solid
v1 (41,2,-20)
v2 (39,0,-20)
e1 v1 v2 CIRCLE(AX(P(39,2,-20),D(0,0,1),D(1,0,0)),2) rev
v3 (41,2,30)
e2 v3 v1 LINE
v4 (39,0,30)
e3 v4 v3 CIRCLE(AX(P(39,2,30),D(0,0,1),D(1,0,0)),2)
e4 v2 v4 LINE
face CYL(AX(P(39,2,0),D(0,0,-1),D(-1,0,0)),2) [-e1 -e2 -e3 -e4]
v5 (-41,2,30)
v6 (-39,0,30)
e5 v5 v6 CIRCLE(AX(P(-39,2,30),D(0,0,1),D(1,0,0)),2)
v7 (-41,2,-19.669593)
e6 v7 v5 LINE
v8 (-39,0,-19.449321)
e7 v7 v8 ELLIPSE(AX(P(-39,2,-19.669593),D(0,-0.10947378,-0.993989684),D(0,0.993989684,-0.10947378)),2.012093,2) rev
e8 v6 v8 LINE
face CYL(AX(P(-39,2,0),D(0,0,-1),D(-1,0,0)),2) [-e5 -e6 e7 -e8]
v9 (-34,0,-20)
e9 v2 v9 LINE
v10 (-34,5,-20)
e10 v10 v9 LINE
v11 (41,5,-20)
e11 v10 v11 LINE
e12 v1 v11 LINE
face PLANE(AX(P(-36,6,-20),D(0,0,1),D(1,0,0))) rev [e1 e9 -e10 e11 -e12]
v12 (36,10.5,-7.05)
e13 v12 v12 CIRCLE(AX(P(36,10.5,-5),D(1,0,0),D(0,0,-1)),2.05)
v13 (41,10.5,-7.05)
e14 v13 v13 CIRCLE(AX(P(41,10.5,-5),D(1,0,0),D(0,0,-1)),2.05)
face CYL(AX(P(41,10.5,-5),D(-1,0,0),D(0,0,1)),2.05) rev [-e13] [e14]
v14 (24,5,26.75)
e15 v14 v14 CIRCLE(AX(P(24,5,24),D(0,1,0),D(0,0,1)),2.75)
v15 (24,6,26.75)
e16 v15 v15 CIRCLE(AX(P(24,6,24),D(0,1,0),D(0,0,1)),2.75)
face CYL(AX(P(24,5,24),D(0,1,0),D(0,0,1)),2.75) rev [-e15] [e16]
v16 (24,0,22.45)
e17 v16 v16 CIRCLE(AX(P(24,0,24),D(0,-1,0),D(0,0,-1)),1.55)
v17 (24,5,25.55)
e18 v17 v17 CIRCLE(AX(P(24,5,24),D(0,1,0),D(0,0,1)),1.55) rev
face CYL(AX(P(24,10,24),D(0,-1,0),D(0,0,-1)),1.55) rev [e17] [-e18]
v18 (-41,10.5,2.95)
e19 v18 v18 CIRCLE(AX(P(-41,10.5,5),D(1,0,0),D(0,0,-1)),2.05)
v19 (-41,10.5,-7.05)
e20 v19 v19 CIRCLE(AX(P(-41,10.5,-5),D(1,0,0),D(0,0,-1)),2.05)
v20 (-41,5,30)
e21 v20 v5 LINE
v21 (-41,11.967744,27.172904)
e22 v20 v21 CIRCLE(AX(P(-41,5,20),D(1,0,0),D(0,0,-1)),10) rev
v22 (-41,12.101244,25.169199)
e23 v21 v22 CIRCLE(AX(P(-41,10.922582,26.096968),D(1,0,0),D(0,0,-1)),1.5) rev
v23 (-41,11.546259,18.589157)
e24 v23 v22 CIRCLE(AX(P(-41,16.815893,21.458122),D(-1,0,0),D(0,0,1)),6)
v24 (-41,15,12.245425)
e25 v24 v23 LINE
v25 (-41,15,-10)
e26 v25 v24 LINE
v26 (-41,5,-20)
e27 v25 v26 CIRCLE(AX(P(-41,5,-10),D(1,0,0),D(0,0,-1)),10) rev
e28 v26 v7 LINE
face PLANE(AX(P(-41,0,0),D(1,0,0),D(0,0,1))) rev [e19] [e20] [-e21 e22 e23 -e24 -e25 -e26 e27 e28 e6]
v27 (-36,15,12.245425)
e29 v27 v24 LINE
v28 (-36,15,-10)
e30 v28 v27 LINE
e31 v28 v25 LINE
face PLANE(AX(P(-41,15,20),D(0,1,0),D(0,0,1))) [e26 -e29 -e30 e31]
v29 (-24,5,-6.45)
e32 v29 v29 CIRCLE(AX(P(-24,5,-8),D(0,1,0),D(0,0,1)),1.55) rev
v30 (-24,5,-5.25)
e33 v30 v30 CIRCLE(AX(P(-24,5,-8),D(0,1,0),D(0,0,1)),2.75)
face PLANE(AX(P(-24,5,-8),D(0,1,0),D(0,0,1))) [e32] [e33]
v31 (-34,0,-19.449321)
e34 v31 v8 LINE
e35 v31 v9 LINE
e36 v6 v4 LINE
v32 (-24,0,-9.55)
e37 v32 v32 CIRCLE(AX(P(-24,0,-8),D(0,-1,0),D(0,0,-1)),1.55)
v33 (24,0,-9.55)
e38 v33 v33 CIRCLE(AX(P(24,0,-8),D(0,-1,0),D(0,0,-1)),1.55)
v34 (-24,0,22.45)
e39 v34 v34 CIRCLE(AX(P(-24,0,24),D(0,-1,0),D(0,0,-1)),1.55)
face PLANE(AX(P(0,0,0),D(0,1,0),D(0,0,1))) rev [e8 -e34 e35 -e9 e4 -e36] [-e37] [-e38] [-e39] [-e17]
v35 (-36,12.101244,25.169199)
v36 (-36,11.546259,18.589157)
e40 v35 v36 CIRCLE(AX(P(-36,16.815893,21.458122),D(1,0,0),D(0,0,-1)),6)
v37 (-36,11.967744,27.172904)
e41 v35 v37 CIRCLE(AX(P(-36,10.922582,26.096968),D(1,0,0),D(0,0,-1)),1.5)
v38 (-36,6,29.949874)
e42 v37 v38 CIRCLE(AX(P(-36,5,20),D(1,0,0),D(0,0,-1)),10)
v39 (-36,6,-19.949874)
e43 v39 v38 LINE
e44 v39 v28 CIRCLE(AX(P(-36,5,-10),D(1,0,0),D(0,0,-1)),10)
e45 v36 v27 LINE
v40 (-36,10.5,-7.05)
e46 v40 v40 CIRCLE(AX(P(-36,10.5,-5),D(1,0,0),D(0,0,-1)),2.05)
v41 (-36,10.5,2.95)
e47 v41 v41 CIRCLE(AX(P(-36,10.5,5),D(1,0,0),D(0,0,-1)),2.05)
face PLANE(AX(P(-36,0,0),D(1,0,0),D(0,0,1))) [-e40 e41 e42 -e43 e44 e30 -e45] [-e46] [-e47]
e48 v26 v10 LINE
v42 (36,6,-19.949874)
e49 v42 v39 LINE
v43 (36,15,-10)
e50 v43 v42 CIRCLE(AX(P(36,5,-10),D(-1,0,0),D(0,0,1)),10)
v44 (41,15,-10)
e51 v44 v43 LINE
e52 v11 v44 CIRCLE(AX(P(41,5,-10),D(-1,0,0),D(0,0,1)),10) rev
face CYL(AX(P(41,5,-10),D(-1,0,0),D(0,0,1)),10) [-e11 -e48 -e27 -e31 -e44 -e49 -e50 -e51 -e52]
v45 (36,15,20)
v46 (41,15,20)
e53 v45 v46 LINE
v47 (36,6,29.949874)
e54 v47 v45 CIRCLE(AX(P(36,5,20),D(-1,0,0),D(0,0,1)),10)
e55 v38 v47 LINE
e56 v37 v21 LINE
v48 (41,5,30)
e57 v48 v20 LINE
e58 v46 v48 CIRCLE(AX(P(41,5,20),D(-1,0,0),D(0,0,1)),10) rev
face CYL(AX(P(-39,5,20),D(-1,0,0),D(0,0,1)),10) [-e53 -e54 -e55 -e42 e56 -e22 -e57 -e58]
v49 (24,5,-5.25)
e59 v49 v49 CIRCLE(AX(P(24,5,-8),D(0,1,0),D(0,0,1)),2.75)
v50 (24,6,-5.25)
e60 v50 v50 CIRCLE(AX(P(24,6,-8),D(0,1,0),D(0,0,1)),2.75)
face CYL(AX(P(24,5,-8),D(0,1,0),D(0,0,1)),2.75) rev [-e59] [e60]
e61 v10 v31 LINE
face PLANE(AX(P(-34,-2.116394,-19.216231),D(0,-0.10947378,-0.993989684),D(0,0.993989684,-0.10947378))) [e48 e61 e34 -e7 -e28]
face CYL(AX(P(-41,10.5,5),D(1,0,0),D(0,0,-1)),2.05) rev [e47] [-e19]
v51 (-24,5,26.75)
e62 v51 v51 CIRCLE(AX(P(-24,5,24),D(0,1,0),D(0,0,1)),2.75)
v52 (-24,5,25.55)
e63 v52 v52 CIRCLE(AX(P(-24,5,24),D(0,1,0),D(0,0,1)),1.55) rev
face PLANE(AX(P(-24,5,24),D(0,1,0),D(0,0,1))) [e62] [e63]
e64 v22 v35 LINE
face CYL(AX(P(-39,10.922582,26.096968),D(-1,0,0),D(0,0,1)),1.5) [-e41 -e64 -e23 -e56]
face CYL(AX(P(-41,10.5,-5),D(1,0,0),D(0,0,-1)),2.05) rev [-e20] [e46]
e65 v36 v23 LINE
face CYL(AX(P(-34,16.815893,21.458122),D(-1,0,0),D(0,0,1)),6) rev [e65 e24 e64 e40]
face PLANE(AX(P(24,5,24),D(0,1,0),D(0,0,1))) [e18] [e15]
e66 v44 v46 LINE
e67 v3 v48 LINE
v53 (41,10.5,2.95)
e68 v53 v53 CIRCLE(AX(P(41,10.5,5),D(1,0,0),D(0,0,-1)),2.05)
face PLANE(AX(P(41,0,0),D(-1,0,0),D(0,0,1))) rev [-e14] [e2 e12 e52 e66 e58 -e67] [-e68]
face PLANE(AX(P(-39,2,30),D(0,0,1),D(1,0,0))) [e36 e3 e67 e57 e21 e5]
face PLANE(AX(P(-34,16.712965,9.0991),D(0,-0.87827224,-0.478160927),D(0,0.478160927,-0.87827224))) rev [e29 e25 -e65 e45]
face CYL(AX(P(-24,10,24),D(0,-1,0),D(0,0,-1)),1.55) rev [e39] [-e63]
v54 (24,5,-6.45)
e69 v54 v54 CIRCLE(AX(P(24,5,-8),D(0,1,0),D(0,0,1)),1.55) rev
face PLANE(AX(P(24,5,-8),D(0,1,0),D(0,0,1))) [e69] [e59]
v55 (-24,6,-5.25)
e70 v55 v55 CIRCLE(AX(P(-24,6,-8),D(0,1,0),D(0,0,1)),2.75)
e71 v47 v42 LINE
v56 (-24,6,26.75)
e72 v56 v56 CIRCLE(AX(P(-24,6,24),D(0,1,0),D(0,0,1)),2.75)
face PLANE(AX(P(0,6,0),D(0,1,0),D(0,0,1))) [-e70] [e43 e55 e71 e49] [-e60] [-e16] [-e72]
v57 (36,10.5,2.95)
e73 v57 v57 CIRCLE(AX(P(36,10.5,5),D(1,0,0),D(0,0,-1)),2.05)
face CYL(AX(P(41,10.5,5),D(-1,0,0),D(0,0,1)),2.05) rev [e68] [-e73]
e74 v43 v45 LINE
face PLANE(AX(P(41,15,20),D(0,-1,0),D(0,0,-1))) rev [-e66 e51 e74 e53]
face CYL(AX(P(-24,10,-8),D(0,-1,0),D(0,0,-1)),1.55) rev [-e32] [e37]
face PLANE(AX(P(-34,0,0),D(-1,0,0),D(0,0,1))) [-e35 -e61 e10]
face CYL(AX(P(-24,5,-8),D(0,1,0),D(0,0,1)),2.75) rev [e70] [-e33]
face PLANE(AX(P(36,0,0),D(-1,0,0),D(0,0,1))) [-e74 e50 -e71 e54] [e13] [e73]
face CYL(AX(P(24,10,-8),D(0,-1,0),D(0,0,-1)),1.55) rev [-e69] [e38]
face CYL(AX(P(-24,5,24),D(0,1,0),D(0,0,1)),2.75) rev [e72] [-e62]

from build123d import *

# Parameters (mm, degrees)
SKETCH1_W           = 72
SKETCH1_H           = 40
BOSS_EXTRUDE1_DEPTH = 6
SKETCH3_W           = 40
SKETCH3_H           = 15
SKETCH3_R           = 2.05
BOSS_EXTRUDE2_DEPTH = 5
FILLET2_R           = 10
FILLET1_R           = 2
BOSS_EXTRUDE3_DEPTH = 10
SKETCH6_R           = 1.55
CUT_EXTRUDE2_DEPTH  = 10
SKETCH2_R           = 2.75
CUT_EXTRUDE1_DEPTH  = 1
FILLET3_R           = 10
CUT_EXTRUDE3_DEPTH  = 7
FILLET4_R           = 1.5


with BuildPart() as part:
    # Sketch1 → Boss-Extrude1 (new body)
    with BuildSketch(Plane(origin=(0, 0, 0), x_dir=(1, 0, 0), z_dir=(0, 1, 0))):
        Rectangle(SKETCH1_W, SKETCH1_H)
    extrude(amount=BOSS_EXTRUDE1_DEPTH)

    # Sketch3 → Boss-Extrude2 (add)
    with BuildSketch(Plane(origin=(36, 0, 0), x_dir=(0, 0, -1), z_dir=(1, 0, 0))):
        with Locations((0, 7.5)):
            Rectangle(SKETCH3_W, SKETCH3_H)
        with Locations((-5, 10.5)):
            Circle(SKETCH3_R, mode=Mode.SUBTRACT)
        with Locations((5, 10.5)):
            Circle(SKETCH3_R, mode=Mode.SUBTRACT)
    boss_extrude2 = extrude(amount=BOSS_EXTRUDE2_DEPTH)

    # Mirror1: Boss-Extrude2 across plane
    add(boss_extrude2.mirror(Plane.ZY))

    # Fillet2
    fillet2_edges = [part.edges().sort_by_distance(p)[0] for p in [
        (38.5, 15, -20),
    ]]
    fillet(fillet2_edges, radius=FILLET2_R)

    # Fillet1
    fillet1_edges = [part.edges().sort_by_distance(p)[0] for p in [
        (41, 0, 0),
        (-41, 0, 0),
    ]]
    fillet(fillet1_edges, radius=FILLET1_R)

    # Sketch5 → Boss-Extrude3 (add)
    with BuildSketch(Plane.XY.offset(20)):
        with BuildLine():
            Line((-41, 15), (-41, 2))
            ThreePointArc((-41, 2), (-40.414213562, 0.585786438), (-39, 0))
            Line((-39, 0), (39, 0))
            ThreePointArc((39, 0), (40.414213562, 0.585786438), (41, 2))
            Line((41, 2), (41, 15))
            Line((41, 15), (36, 15))
            Line((36, 15), (36, 6))
            Line((36, 6), (-36, 6))
            Line((-36, 6), (-36, 15))
            Line((-36, 15), (-41, 15))
        make_face()
    extrude(amount=BOSS_EXTRUDE3_DEPTH)

    # Sketch6 → Cut-Extrude2 (cut)
    with BuildSketch(Plane.XZ):
        with Locations((24, 24)):
            Circle(SKETCH6_R)
        with Locations((24, -8)):
            Circle(SKETCH6_R)
        with Locations((-24, 24)):
            Circle(SKETCH6_R)
        with Locations((-24, -8)):
            Circle(SKETCH6_R)
    extrude(amount=-CUT_EXTRUDE2_DEPTH, mode=Mode.SUBTRACT)

    # Sketch2 → Cut-Extrude1 (cut)
    with BuildSketch(Plane(origin=(0, 6, 0), x_dir=(1, 0, 0), z_dir=(0, 1, 0))):
        with Locations((-24, 8)):
            Circle(SKETCH2_R)
        with Locations((-24, -24)):
            Circle(SKETCH2_R)
        with Locations((24, -24)):
            Circle(SKETCH2_R)
        with Locations((24, 8)):
            Circle(SKETCH2_R)
    extrude(amount=-CUT_EXTRUDE1_DEPTH, mode=Mode.SUBTRACT)

    # Fillet3
    fillet3_edges = [part.edges().sort_by_distance(p)[0] for p in [
        (-38.5, 15, 30),
    ]]
    fillet(fillet3_edges, radius=FILLET3_R)

    # Sketch7 → Cut-Extrude3 (cut)
    with BuildSketch(Plane.ZY.offset(41)):
        with BuildLine():
            Line((12.245425122, 15), (18.589156814, 11.546259248))
            ThreePointArc((18.589156814, 11.546259248), (22.57380679, 10.92053449), (26.05426141, 12.959014938))
            ThreePointArc((26.05426141, 12.959014938), (23.194514879, 14.476026313), (20, 15))
            Line((20, 15), (12.245425122, 15))
        make_face()
        Polygon((-20, 5), (-20.731407815, 5), (-20.180729163, 0), (-19.449321347, 0), align=None)
    extrude(amount=-CUT_EXTRUDE3_DEPTH, mode=Mode.SUBTRACT)

    # Fillet4
    fillet4_edges = [part.edges().sort_by_distance(p)[0] for p in [
        (-38.5, 12.959014938, 26.05426141),
    ]]
    fillet(fillet4_edges, radius=FILLET4_R)


solid = part.part
